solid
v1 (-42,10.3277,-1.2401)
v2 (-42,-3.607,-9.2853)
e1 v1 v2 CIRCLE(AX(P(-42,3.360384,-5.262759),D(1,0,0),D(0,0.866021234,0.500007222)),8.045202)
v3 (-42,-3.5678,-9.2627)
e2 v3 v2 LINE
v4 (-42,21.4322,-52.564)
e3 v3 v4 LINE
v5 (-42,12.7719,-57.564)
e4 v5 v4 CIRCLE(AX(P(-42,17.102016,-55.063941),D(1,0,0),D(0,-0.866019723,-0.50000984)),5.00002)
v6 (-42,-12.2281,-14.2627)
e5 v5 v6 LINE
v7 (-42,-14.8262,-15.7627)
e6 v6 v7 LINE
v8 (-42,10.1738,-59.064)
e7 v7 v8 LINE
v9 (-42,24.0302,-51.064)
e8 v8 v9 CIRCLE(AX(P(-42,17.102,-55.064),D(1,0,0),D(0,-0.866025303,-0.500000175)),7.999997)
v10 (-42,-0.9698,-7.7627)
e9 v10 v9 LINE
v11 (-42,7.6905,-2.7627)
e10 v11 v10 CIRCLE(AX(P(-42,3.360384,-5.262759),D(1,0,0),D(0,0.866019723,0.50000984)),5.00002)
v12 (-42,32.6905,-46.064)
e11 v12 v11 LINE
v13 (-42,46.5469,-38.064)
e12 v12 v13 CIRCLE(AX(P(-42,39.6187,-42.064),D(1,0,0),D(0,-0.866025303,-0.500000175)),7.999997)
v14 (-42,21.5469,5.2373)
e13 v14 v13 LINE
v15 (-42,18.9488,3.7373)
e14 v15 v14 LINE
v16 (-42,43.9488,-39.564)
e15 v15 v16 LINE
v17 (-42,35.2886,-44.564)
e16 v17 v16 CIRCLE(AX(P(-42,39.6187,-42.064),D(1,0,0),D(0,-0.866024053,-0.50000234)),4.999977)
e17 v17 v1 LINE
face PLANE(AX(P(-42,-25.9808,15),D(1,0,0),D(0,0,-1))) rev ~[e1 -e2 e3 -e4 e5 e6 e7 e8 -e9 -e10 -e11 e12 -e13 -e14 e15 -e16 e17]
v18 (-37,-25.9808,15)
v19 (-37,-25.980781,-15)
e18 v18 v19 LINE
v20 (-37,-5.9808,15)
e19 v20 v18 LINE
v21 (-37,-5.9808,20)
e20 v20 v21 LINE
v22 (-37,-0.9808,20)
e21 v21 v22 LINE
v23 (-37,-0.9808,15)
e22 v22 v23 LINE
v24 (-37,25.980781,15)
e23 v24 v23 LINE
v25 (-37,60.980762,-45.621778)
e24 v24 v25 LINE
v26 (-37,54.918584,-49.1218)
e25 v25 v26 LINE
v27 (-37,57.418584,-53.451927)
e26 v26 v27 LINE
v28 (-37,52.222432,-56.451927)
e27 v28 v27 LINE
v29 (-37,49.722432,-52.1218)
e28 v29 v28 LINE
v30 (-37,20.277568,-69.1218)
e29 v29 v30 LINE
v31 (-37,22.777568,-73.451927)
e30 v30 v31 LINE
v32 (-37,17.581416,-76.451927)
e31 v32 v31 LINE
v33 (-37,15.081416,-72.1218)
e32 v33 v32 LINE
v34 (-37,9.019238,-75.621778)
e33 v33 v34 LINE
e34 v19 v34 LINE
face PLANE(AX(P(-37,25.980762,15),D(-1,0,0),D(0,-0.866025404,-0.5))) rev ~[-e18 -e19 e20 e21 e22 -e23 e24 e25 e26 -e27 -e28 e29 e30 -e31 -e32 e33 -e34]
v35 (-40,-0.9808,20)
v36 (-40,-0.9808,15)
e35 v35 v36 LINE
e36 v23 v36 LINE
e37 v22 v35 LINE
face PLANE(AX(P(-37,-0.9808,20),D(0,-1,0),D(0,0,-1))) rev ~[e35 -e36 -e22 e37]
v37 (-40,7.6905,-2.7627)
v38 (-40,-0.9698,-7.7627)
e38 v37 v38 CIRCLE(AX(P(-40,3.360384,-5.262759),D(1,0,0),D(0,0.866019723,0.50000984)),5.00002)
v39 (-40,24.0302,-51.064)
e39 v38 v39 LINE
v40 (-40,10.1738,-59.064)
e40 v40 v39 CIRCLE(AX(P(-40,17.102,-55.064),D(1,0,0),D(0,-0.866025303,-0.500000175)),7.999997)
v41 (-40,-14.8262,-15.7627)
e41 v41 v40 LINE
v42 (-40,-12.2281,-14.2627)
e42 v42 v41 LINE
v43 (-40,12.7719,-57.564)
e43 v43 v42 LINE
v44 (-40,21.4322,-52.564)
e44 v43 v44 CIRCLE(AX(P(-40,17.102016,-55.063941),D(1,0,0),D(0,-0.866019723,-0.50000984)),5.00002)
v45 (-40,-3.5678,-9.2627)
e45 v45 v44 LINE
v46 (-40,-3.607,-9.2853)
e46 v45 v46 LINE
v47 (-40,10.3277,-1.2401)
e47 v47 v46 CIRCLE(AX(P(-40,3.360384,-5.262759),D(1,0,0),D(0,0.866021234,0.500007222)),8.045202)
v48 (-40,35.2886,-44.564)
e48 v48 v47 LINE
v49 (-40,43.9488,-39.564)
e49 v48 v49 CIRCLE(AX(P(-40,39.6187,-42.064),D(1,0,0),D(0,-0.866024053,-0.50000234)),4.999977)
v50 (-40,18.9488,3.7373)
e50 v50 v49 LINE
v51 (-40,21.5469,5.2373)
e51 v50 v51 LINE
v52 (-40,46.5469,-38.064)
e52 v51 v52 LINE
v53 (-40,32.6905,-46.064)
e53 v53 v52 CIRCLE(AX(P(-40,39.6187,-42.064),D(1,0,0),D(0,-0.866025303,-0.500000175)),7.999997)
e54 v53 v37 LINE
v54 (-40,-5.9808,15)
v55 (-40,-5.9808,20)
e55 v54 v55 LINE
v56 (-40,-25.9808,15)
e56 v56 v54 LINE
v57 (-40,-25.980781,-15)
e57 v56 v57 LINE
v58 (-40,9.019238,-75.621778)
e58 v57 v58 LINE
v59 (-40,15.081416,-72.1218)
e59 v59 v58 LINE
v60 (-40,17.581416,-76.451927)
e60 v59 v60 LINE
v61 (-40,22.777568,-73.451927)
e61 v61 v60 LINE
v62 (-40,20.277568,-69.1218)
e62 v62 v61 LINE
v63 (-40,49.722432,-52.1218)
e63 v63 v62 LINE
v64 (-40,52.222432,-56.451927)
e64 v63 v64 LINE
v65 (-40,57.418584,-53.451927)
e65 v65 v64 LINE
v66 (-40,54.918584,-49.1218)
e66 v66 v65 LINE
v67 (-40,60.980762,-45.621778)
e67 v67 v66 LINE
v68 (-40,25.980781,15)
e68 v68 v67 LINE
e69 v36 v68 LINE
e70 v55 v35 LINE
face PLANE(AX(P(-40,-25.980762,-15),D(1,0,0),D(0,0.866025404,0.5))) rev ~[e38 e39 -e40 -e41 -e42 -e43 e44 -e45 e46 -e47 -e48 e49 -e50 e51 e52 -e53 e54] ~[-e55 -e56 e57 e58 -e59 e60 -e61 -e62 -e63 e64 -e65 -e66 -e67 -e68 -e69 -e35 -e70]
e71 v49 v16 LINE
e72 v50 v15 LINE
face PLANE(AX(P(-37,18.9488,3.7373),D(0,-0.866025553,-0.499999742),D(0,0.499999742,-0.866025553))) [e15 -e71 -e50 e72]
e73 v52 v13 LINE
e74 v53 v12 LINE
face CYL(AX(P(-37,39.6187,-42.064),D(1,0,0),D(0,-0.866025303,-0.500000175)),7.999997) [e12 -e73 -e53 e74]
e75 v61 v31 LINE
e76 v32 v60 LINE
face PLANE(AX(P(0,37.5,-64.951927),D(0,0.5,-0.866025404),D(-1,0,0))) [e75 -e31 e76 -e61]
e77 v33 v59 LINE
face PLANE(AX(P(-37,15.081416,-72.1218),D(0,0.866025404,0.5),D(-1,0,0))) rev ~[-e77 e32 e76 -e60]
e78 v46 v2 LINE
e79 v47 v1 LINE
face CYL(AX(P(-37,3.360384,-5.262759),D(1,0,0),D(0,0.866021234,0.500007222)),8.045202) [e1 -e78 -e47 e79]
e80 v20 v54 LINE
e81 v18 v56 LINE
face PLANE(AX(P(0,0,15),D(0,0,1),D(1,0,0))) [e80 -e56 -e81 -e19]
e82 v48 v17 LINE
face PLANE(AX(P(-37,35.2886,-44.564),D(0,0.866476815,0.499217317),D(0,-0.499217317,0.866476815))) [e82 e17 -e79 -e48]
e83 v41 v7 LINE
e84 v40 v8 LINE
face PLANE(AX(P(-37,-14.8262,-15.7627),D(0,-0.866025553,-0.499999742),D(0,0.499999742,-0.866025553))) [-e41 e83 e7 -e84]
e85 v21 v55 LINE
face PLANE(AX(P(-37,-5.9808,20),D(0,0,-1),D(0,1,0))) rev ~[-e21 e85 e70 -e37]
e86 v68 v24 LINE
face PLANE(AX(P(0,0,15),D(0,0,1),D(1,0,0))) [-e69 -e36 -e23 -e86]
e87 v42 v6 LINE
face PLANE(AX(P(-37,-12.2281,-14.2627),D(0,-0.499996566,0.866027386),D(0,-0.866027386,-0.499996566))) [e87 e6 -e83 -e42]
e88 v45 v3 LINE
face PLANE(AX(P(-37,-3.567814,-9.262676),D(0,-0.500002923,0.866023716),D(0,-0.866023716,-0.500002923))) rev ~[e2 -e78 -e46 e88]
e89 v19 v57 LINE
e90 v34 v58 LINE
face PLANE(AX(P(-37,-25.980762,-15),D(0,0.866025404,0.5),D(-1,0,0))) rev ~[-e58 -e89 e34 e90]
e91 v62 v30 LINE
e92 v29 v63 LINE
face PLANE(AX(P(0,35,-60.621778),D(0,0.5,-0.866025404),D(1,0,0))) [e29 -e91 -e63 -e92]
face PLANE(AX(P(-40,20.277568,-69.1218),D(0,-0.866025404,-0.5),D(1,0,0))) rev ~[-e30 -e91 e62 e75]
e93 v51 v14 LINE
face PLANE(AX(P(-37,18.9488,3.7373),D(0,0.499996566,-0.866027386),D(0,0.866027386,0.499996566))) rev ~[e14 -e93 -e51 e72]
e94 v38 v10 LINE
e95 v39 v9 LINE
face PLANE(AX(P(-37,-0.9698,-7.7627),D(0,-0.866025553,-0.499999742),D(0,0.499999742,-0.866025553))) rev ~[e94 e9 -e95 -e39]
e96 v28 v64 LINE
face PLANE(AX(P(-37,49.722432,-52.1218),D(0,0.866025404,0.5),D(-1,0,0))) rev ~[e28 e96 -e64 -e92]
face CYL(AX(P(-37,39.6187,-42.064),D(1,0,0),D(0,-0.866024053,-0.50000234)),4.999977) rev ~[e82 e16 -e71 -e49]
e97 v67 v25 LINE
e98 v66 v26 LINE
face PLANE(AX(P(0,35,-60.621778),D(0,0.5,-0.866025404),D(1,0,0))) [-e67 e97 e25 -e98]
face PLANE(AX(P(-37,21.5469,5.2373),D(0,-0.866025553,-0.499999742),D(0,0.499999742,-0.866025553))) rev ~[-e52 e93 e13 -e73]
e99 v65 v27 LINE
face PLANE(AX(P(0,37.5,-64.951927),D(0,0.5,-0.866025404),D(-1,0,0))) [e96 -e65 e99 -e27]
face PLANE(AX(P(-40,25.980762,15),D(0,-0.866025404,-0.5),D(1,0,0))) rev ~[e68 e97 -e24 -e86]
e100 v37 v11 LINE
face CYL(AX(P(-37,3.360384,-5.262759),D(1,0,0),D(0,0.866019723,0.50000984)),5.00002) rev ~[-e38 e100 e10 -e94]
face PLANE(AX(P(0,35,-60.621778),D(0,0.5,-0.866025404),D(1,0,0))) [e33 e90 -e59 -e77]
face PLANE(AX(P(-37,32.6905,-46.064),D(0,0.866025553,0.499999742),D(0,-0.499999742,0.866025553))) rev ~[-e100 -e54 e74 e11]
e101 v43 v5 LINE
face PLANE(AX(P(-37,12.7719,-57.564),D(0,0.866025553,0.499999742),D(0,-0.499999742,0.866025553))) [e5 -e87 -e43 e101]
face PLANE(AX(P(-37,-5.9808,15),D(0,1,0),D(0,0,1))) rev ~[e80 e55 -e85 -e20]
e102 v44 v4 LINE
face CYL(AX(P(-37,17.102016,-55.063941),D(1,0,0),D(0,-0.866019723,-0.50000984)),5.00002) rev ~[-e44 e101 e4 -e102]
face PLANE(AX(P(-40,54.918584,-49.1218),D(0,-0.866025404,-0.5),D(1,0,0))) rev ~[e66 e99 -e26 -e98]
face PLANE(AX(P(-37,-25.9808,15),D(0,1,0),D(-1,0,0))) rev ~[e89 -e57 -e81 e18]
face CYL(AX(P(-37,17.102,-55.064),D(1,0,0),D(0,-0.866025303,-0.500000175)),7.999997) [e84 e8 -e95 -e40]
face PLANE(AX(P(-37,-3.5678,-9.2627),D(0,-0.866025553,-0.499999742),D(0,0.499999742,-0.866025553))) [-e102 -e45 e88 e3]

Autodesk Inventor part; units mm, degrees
ref_plane "Plan de construction1" through (0, 0, 0) normal (0, 0.5, -0.8660254) x (1, 0, 0)
sketch "Esquisse1" plane through (0, 0, 0) normal (0, 0.5, -0.8660254) x (1, 0, 0)
  line L0 (-40, 0) -> (-40, -30)
  line L1 (-40, -30) -> (-37, -30)
  line L2 (-40, -30) -> (-37, -30)
  line L3 (-37, -30) -> (-37, 30)
  line L4 (-37, 30) -> (-40, 30)
  line L5 (-40, 30) -> (-40, -30)
  point P0 (0, 0)
  point P1 (-37, 0)
  point P2 (-37, -30)
  dimension "d2" = 30
  dimension "d3" = 3
  dimension "d4" = 60
  dimension "d49" = 37
  dimension "d50" = 40
extrude "Extrusion1" add sketch "Esquisse1" along normal blind 70
ref_plane "Plan de construction2" through (0, 0, 15) normal (0, 0, 1) x (1, 0, 0)
sketch "Esquisse2" plane through (0, 0, 15) normal (0, 0, 1) x (1, 0, 0)
  line L0 (-40, -25.9808) -> (-40, 25.9808) projected
  line L1 (-37, 25.9808) -> (-37, -25.9808) projected
  line L2 (-40, 25.9808) -> (-37, 25.9808) projected
  line L3 (-37, -25.9808) -> (-40, -25.9808) projected
  line L4 (-37, 60.9808) -> (-37, 9.0192) projected
  line L5 (-40, 25.9808) -> (-37, 25.9808)
  line L6 (-37, 25.9808) -> (-37, 35.9808)
  line L7 (-37, 35.9808) -> (-40, 35.9808)
  line L8 (-40, 35.9808) -> (-40, 25.9808)
  point P0 (0, 0)
  point P1 (37, 25.9808)
  dimension "d46" = 10
extrude "Extrusion2" add sketch "Esquisse2" against normal blind 30 contours L0 L2 L1 L3
ref_plane "Plan de construction3" through (-37, -25.9808, 15) normal (1, 0, 0) x (0, 0, -1)
sketch "Esquisse3" plane through (-37, -25.9808, 15) normal (1, 0, 0) x (0, 0, -1)
  line L0 (0, 0) -> (0, 20)
  line L1 (0, 51.9615) -> (0, 0) projected
  line L2 (0, 20) -> (-5, 20)
  line L3 (-5, 20) -> (-5, 25)
  line L4 (-5, 25) -> (0, 25)
  point P0 (15, 25.9808)
  dimension "d16" = 20
  dimension "d17" = 5
extrude "Extrusion3" add sketch "Esquisse3" against normal up to surface (3 mm away)
sketch "Esquisse13" plane through (0, 35, -60.6218) normal (0, 0.5, -0.8660254) x (-1, 0, 0)
  line L0 (37, 30) -> (37, -30) projected
  line L1 (37, 0) -> (37, 20)
  line L2 (37, 20) -> (40, 20)
  line L3 (40, -30) -> (40, 30) projected
  line L4 (40, 20) -> (40, 23)
  line L5 (40, 23) -> (37, 23)
  line L6 (37, 23) -> (37, 17)
  line L7 (37, 17) -> (40, 17)
  line L8 (40, 17) -> (40, 20)
  line L9 (37, 0) -> (37, -20)
  line L10 (37, -20) -> (40, -20)
  line L11 (40, -20) -> (40, -17)
  line L12 (40, -17) -> (37, -17)
  line L13 (37, -17) -> (37, -23)
  line L14 (37, -23) -> (40, -23)
  line L15 (40, -23) -> (40, -20)
  point P0 (0, 0)
  point P1 (37, 23)
  point P2 (37, 17)
  point P3 (40, 17)
  dimension "d53" = 20
  dimension "d54" = 3
  dimension "d55" = 6
  dimension "d56" = 20
  dimension "d57" = 3
  dimension "d58" = 6
extrude "Extrusion12" add sketch "Esquisse13" along normal blind 5 contours L5 L3 L2 L0 | L2 L3 L7 L0 | L12 L3 L10 L0 | L10 L3 L14 L0
sketch "Esquisse14" plane through (-37, -25.9808, 15) normal (1, 0, 0) x (0, 0, -1)
  line L0 (11.2627, 44.9296) -> (54.564, 69.9296)
  line L1 (11.2627, 44.9296) -> (61.2627, 44.9296) construction
  arc A0 (59.564, 61.2694) -> (54.564, 69.9296) centre (57.064, 65.5995) ccw
  line L2 (59.564, 61.2694) -> (16.2401, 36.3085)
  line L3 (26.3922, 19.4858) -> (76.3922, 19.4858) construction
  line L4 (11.2627, 44.9296) -> (9.7627, 47.5277)
  line L5 (9.7627, 47.5277) -> (53.064, 72.5277)
  line L6 (59.564, 61.2694) -> (61.064, 58.6713)
  line L7 (61.064, 58.6713) -> (17.7627, 33.6713)
  line L8 (17.7627, 33.6713) -> (22.7627, 25.011)
  line L9 (17.7627, 33.6713) -> (27.7627, 33.6713) construction
  line L10 (22.7627, 25.011) -> (66.064, 50.011)
  line L11 (17.7627, 33.6713) -> (22.7627, 25.011)
  arc A1 (17.7627, 33.6713) -> (22.7627, 25.011) centre (20.2627, 29.3412) ccw
  line L12 (22.7627, 25.011) -> (24.2627, 22.413)
  line L13 (24.2627, 22.413) -> (67.564, 47.413)
  arc A2 (16.2401, 36.3085) -> (24.2853, 22.3738) centre (20.2627, 29.3412) ccw
  arc A3 (61.064, 58.6713) -> (53.064, 72.5277) centre (57.064, 65.5995) ccw
  line L14 (67.564, 47.413) -> (72.564, 38.7527)
  line L15 (67.564, 47.413) -> (77.564, 47.413) construction
  line L16 (72.564, 38.7527) -> (29.2627, 13.7527)
  line L17 (29.2627, 13.7527) -> (30.7627, 11.1546)
  line L18 (30.7627, 11.1546) -> (74.064, 36.1546)
  arc A4 (72.564, 38.7527) -> (67.564, 47.413) centre (70.064, 43.0828) ccw
  arc A5 (74.064, 36.1546) -> (66.064, 50.011) centre (70.064, 43.0828) ccw
  line L19 (16.2401, 36.3085) -> (17.7627, 33.6713)
  line L20 (22.7627, 25.011) -> (24.2853, 22.3738)
  line L21 (59.564, 61.2694) -> (61.064, 58.6713)
  dimension "d61" = 50
  dimension "d62" = 30
  dimension "d63" = 10
  dimension "d64" = 5
  dimension "d71" = 3
  dimension "d72" = 3
  dimension "d75" = 10
  dimension "d76" = 60
  dimension "d78" = 90
  dimension "d79" = 3
  dimension "d80" = 10
  dimension "d81" = 60
  dimension "d82" = 50
  dimension "d83" = 90
  dimension "d84" = 3
  dimension "d85" = 5
extrude "Extrusion13" add sketch "Esquisse14" against normal blind 5 contours L4 L5 A3 L6 A0 L0 | L6 L7 L19 L2 | L19 A1 L12 L20 A2 | L12 L10 A5 L18 L17 L16 A4 L13
properties part number "autour hélice autre côté"
